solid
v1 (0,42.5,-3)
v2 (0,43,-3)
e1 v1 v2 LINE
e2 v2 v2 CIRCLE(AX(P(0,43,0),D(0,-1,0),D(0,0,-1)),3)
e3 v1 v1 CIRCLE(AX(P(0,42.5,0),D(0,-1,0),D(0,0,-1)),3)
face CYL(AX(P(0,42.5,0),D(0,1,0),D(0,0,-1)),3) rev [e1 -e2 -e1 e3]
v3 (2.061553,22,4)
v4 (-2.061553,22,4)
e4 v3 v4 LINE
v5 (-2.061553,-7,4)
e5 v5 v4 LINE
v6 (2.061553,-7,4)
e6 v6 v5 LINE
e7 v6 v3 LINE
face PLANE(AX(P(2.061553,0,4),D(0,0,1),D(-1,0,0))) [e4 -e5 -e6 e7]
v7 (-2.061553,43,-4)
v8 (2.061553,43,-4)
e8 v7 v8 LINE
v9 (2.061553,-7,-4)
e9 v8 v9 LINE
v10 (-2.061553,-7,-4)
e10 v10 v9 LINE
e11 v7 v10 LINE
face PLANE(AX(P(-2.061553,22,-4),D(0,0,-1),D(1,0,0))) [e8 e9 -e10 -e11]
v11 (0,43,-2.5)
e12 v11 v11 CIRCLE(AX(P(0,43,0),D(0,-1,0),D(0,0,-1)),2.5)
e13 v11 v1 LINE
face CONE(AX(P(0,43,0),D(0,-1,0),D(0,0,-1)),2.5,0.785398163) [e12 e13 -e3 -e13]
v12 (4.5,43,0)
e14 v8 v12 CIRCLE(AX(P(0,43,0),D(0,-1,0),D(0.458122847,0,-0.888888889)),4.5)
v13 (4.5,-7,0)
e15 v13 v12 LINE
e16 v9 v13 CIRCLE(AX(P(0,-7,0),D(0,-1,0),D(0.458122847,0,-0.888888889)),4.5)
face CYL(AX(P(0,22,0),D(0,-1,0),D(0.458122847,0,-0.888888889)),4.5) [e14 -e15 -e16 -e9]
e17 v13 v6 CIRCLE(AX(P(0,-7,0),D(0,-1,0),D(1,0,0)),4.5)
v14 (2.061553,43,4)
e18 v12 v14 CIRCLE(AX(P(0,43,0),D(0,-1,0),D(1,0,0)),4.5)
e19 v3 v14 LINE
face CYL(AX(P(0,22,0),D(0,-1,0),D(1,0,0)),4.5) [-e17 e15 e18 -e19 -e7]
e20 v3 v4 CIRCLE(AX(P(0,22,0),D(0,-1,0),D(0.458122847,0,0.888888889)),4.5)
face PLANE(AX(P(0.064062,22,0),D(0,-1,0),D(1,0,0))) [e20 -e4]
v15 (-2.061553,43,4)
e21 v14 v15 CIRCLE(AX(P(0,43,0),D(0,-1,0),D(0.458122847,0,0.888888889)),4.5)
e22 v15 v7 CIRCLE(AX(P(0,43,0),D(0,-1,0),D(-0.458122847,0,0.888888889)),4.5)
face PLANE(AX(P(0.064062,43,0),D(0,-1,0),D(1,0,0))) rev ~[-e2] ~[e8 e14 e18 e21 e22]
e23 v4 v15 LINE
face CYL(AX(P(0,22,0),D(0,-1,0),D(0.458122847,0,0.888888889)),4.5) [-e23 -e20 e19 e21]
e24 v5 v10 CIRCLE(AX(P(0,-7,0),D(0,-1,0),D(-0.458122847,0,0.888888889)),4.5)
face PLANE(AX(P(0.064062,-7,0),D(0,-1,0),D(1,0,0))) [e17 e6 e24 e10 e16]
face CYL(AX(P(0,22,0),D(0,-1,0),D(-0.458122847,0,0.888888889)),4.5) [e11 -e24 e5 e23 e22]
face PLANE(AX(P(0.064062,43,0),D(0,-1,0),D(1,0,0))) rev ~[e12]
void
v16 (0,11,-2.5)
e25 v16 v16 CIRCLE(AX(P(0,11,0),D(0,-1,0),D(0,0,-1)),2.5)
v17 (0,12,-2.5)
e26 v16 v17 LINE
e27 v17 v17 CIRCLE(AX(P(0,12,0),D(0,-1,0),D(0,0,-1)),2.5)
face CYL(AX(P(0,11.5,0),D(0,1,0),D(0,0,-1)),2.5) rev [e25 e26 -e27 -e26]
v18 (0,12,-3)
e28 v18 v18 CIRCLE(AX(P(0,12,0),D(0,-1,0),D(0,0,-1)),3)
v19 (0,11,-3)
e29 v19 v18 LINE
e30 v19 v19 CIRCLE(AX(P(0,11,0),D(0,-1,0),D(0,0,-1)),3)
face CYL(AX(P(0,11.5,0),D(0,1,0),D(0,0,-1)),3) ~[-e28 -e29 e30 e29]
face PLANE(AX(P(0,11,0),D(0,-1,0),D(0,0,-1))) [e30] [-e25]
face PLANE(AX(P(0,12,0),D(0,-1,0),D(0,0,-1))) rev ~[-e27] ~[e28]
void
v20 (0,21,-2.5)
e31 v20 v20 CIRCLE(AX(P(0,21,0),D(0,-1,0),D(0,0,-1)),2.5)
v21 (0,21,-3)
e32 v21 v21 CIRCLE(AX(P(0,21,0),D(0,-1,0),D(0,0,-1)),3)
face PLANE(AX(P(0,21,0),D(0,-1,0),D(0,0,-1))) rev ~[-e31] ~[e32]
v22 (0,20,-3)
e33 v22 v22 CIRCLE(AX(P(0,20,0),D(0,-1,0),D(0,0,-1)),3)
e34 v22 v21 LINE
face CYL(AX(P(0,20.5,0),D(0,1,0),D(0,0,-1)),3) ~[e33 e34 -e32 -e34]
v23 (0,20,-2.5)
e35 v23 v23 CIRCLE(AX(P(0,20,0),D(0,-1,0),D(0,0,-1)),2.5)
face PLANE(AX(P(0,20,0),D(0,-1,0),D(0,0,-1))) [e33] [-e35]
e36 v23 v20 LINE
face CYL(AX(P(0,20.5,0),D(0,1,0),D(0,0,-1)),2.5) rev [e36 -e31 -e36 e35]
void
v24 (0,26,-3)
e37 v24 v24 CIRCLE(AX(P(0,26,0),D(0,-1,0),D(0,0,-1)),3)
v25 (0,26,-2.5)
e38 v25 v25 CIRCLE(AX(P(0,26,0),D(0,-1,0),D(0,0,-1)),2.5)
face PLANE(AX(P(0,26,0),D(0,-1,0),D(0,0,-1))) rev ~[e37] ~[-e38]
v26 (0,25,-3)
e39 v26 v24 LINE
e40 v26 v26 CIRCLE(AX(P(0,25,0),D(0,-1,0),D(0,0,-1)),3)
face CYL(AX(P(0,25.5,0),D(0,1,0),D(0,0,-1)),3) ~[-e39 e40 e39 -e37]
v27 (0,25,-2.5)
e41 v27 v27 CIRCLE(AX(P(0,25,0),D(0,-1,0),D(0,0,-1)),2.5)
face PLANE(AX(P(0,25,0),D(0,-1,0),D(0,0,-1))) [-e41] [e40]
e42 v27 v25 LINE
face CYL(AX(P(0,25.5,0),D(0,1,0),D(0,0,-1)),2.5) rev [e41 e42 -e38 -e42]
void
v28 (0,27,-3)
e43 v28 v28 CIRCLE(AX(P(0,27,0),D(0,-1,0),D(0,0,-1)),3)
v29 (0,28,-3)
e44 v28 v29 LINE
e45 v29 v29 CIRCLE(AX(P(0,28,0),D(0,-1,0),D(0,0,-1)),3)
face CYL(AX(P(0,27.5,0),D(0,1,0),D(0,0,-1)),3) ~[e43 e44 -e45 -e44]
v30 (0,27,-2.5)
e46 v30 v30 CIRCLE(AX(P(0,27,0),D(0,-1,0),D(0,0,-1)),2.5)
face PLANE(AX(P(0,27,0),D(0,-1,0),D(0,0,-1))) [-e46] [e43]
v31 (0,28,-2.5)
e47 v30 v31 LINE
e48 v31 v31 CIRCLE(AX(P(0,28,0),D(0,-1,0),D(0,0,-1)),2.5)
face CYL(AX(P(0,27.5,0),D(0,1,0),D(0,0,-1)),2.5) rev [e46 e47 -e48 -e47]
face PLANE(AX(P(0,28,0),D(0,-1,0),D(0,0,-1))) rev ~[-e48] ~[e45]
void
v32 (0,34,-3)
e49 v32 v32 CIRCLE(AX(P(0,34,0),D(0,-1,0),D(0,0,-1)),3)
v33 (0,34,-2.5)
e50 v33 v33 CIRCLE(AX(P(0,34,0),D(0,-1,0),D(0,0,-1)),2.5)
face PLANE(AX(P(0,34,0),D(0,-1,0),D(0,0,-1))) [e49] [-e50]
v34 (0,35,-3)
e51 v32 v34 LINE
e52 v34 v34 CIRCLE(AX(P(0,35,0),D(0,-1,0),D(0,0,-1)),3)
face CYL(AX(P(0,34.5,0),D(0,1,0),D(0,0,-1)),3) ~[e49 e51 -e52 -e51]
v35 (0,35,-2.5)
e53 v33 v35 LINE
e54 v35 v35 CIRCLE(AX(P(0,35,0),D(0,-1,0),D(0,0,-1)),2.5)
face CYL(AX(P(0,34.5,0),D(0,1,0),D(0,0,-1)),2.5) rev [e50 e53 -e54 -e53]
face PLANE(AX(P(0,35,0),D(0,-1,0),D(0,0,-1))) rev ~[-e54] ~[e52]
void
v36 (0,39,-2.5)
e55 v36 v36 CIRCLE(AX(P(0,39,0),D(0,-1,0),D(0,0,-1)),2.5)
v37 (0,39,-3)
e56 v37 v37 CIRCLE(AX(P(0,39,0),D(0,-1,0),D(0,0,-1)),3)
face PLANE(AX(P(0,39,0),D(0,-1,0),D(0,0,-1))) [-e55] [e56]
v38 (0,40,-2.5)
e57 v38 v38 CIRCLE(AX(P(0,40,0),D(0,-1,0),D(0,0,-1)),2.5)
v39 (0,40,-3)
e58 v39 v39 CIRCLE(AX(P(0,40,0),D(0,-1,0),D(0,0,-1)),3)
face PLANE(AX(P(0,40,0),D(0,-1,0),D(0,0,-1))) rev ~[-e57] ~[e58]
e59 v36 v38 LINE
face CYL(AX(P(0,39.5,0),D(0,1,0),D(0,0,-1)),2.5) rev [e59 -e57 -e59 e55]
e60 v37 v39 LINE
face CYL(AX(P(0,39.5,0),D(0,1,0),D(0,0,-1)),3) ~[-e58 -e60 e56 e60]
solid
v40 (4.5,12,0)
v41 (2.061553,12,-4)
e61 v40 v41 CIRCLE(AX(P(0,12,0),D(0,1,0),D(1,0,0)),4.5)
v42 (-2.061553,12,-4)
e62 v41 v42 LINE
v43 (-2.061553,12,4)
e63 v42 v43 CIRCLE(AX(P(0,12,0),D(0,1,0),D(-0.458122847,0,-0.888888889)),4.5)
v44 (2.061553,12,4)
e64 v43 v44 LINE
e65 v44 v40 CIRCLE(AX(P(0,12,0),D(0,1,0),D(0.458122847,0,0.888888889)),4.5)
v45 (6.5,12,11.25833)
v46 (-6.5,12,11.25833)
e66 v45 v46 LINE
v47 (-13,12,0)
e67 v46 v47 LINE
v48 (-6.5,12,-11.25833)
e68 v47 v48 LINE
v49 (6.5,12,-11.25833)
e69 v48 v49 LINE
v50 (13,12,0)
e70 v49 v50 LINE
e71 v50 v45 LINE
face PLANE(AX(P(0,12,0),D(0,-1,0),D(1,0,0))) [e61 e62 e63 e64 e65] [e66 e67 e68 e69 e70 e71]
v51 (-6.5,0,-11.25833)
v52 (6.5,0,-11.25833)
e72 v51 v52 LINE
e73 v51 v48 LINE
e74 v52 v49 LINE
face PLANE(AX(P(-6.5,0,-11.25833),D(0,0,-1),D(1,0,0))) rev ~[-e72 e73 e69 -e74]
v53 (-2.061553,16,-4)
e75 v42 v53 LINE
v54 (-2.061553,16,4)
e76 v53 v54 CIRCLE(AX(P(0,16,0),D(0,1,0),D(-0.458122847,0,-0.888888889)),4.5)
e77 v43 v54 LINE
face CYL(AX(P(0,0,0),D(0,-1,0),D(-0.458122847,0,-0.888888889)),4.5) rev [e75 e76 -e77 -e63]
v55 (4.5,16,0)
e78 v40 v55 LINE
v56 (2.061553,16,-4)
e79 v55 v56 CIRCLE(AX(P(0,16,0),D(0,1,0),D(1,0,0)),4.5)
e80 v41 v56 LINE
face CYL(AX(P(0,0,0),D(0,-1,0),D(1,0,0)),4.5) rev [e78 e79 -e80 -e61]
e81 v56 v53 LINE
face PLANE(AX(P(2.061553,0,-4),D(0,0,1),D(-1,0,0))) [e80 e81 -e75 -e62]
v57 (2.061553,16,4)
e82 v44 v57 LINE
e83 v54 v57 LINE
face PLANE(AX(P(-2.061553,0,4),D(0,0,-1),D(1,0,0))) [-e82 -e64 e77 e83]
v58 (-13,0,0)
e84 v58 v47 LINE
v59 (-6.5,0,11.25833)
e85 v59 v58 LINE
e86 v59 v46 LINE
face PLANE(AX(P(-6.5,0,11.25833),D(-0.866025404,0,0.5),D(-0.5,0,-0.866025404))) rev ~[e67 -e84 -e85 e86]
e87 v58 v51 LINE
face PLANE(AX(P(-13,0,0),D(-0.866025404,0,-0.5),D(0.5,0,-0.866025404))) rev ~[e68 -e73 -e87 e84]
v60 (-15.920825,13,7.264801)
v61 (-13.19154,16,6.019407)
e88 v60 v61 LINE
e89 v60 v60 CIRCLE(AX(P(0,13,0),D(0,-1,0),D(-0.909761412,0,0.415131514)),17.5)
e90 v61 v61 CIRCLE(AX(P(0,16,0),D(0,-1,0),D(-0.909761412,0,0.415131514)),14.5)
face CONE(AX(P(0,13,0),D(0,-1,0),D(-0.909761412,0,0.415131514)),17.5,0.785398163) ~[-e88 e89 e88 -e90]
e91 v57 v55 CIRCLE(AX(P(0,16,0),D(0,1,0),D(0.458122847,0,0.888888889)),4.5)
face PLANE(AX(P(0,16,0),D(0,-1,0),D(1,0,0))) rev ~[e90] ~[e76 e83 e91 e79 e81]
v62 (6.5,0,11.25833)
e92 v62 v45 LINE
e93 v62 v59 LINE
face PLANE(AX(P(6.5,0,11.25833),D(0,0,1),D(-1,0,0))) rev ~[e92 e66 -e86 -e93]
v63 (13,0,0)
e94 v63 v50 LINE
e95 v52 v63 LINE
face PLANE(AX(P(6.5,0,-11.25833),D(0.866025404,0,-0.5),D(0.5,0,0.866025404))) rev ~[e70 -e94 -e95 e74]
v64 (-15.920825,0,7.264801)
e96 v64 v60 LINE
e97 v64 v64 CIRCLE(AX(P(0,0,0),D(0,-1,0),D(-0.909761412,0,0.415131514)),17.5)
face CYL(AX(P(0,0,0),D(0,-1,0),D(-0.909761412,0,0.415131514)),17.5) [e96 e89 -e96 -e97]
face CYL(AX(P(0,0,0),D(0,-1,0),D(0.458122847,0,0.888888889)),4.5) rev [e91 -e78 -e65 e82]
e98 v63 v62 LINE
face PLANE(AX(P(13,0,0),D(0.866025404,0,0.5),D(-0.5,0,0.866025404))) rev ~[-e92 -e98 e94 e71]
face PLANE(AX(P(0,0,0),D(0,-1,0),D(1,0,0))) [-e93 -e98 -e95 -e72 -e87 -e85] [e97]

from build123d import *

# Parameters (mm, degrees)
F1_DEPTH      = 16
F2_DEPTH      = 12
F3_SIZE       = 3
F4_DEPTH      = 7
F4_DEPTH_BACK = 22
F5_START      = -22
F5_DEPTH      = 21
F6_W          = 1
F6_H          = 0.5


# Not quite as in the source:
# - a feature names something its author has since deleted; it is built from what else it names


with BuildPart() as f1:
    # F0 (on Front) → F1 (new body)
    with BuildSketch(Plane.XZ):
        with BuildLine():
            ThreePointArc((1.668909711, 17.4202393892), (-8.75, 15.1554445662), (-15.9208247065, 7.2648014882))
            ThreePointArc((-15.9208247065, 7.2648014882), (8.75, -15.1554445662), (1.668909711, 17.4202393892))
        make_face()
        Polygon((-13, 0), (-6.5, 11.2583302492), (6.5, 11.2583302492), (13, 0), (6.5, -11.2583302492), (-6.5, -11.2583302492), align=None, mode=Mode.SUBTRACT)
        Polygon((6.5, 11.2583302492), (-6.5, 11.2583302492), (-13, 0), (-6.5, -11.2583302492), (6.5, -11.2583302492), (13, 0), align=None)
        with BuildLine():
            ThreePointArc((-2.0615528128, -4), (-4.5, 0), (-2.0615528128, 4))
            ThreePointArc((-2.0615528128, 4), (0, 4.5), (2.0615528128, 4))
            ThreePointArc((2.0615528128, 4), (3.8423292192, 2.3423292192), (4.5, 0))
            ThreePointArc((4.5, 0), (3.8423292192, -2.3423292192), (2.0615528128, -4))
            ThreePointArc((2.0615528128, -4), (0, -4.5), (-2.0615528128, -4))
        make_face(mode=Mode.SUBTRACT)
        with BuildLine():
            ThreePointArc((2.0615528128, 4), (0, 4.5), (-2.0615528128, 4))
            Line((-2.0615528128, 4), (2.0615528128, 4))
        make_face()
        with BuildLine():
            Line((2.0615528128, -4), (-2.0615528128, -4))
            ThreePointArc((-2.0615528128, -4), (0, -4.5), (2.0615528128, -4))
        make_face()
    extrude(amount=-F1_DEPTH)

    # F0 (on Front) → F2 (cut)
    with BuildSketch(Plane.XZ):
        Polygon((6.5, 11.2583302492), (-6.5, 11.2583302492), (-13, 0), (-6.5, -11.2583302492), (6.5, -11.2583302492), (13, 0), align=None)
        with BuildLine():
            ThreePointArc((-2.0615528128, -4), (-4.5, 0), (-2.0615528128, 4))
            ThreePointArc((-2.0615528128, 4), (0, 4.5), (2.0615528128, 4))
            ThreePointArc((2.0615528128, 4), (3.8423292192, 2.3423292192), (4.5, 0))
            ThreePointArc((4.5, 0), (3.8423292192, -2.3423292192), (2.0615528128, -4))
            ThreePointArc((2.0615528128, -4), (0, -4.5), (-2.0615528128, -4))
        make_face(mode=Mode.SUBTRACT)
        with BuildLine():
            ThreePointArc((2.0615528128, 4), (0, 4.5), (-2.0615528128, 4))
            Line((-2.0615528128, 4), (2.0615528128, 4))
        make_face()
        with BuildLine():
            Line((2.0615528128, -4), (-2.0615528128, -4))
            ThreePointArc((-2.0615528128, -4), (0, -4.5), (2.0615528128, -4))
        make_face()
    extrude(amount=-F2_DEPTH, mode=Mode.SUBTRACT)

    # F3
    f3_edges = [f1.edges().sort_by_distance(p)[0] for p in [
        (-1.66891, 16, -17.420239),
    ]]
    chamfer(f3_edges, length=F3_SIZE)


with BuildPart() as f4:
    # F0 (on Front) → F4 (new body, two sides)
    with BuildSketch(Plane.XZ) as f4_sk:
        with BuildLine():
            Line((2.0615528128, 4), (-2.0615528128, 4))
            ThreePointArc((-2.0615528128, 4), (-4.5, 0), (-2.0615528128, -4))
            Line((-2.0615528128, -4), (2.0615528128, -4))
            ThreePointArc((2.0615528128, -4), (3.8423292192, -2.3423292192), (4.5, 0))
            ThreePointArc((4.5, 0), (3.8423292192, 2.3423292192), (2.0615528128, 4))
        make_face()
    extrude(amount=F4_DEPTH)
    extrude(f4_sk.sketch, amount=-F4_DEPTH_BACK)

    # F0 (on Front) → F5 (join)
    with BuildSketch(Plane.XZ.offset(F5_START)):
        with BuildLine():
            Line((2.0615528128, 4), (-2.0615528128, 4))
            ThreePointArc((-2.0615528128, 4), (-4.5, 0), (-2.0615528128, -4))
            Line((-2.0615528128, -4), (2.0615528128, -4))
            ThreePointArc((2.0615528128, -4), (3.8423292192, -2.3423292192), (4.5, 0))
            ThreePointArc((4.5, 0), (3.8423292192, 2.3423292192), (2.0615528128, 4))
        make_face()
        with BuildLine():
            ThreePointArc((2.0615528128, 4), (0, 4.5), (-2.0615528128, 4))
            Line((-2.0615528128, 4), (2.0615528128, 4))
        make_face()
    extrude(amount=-F5_DEPTH)

    # F6 (on Right) → F7 (revolve, cut)
    with BuildSketch(Plane.YZ):
        with Locations((11.5, -2.75)):
            Rectangle(F6_W, F6_H)
        with Locations((20.5, -2.75)):
            Rectangle(F6_W, F6_H)
        with Locations((25.5, -2.75)):
            Rectangle(F6_W, F6_H)
        with Locations((27.5, -2.75)):
            Rectangle(F6_W, F6_H)
        with Locations((34.5, -2.75)):
            Rectangle(F6_W, F6_H)
        with Locations((39.5, -2.75)):
            Rectangle(F6_W, F6_H)
        Polygon((43, -3), (43, -2.5), (42.5, -3), align=None)
    revolve(axis=Axis((0, 43, 0), (0, -1, 0)), mode=Mode.SUBTRACT)


solid = Compound([f1.part, f4.part])
